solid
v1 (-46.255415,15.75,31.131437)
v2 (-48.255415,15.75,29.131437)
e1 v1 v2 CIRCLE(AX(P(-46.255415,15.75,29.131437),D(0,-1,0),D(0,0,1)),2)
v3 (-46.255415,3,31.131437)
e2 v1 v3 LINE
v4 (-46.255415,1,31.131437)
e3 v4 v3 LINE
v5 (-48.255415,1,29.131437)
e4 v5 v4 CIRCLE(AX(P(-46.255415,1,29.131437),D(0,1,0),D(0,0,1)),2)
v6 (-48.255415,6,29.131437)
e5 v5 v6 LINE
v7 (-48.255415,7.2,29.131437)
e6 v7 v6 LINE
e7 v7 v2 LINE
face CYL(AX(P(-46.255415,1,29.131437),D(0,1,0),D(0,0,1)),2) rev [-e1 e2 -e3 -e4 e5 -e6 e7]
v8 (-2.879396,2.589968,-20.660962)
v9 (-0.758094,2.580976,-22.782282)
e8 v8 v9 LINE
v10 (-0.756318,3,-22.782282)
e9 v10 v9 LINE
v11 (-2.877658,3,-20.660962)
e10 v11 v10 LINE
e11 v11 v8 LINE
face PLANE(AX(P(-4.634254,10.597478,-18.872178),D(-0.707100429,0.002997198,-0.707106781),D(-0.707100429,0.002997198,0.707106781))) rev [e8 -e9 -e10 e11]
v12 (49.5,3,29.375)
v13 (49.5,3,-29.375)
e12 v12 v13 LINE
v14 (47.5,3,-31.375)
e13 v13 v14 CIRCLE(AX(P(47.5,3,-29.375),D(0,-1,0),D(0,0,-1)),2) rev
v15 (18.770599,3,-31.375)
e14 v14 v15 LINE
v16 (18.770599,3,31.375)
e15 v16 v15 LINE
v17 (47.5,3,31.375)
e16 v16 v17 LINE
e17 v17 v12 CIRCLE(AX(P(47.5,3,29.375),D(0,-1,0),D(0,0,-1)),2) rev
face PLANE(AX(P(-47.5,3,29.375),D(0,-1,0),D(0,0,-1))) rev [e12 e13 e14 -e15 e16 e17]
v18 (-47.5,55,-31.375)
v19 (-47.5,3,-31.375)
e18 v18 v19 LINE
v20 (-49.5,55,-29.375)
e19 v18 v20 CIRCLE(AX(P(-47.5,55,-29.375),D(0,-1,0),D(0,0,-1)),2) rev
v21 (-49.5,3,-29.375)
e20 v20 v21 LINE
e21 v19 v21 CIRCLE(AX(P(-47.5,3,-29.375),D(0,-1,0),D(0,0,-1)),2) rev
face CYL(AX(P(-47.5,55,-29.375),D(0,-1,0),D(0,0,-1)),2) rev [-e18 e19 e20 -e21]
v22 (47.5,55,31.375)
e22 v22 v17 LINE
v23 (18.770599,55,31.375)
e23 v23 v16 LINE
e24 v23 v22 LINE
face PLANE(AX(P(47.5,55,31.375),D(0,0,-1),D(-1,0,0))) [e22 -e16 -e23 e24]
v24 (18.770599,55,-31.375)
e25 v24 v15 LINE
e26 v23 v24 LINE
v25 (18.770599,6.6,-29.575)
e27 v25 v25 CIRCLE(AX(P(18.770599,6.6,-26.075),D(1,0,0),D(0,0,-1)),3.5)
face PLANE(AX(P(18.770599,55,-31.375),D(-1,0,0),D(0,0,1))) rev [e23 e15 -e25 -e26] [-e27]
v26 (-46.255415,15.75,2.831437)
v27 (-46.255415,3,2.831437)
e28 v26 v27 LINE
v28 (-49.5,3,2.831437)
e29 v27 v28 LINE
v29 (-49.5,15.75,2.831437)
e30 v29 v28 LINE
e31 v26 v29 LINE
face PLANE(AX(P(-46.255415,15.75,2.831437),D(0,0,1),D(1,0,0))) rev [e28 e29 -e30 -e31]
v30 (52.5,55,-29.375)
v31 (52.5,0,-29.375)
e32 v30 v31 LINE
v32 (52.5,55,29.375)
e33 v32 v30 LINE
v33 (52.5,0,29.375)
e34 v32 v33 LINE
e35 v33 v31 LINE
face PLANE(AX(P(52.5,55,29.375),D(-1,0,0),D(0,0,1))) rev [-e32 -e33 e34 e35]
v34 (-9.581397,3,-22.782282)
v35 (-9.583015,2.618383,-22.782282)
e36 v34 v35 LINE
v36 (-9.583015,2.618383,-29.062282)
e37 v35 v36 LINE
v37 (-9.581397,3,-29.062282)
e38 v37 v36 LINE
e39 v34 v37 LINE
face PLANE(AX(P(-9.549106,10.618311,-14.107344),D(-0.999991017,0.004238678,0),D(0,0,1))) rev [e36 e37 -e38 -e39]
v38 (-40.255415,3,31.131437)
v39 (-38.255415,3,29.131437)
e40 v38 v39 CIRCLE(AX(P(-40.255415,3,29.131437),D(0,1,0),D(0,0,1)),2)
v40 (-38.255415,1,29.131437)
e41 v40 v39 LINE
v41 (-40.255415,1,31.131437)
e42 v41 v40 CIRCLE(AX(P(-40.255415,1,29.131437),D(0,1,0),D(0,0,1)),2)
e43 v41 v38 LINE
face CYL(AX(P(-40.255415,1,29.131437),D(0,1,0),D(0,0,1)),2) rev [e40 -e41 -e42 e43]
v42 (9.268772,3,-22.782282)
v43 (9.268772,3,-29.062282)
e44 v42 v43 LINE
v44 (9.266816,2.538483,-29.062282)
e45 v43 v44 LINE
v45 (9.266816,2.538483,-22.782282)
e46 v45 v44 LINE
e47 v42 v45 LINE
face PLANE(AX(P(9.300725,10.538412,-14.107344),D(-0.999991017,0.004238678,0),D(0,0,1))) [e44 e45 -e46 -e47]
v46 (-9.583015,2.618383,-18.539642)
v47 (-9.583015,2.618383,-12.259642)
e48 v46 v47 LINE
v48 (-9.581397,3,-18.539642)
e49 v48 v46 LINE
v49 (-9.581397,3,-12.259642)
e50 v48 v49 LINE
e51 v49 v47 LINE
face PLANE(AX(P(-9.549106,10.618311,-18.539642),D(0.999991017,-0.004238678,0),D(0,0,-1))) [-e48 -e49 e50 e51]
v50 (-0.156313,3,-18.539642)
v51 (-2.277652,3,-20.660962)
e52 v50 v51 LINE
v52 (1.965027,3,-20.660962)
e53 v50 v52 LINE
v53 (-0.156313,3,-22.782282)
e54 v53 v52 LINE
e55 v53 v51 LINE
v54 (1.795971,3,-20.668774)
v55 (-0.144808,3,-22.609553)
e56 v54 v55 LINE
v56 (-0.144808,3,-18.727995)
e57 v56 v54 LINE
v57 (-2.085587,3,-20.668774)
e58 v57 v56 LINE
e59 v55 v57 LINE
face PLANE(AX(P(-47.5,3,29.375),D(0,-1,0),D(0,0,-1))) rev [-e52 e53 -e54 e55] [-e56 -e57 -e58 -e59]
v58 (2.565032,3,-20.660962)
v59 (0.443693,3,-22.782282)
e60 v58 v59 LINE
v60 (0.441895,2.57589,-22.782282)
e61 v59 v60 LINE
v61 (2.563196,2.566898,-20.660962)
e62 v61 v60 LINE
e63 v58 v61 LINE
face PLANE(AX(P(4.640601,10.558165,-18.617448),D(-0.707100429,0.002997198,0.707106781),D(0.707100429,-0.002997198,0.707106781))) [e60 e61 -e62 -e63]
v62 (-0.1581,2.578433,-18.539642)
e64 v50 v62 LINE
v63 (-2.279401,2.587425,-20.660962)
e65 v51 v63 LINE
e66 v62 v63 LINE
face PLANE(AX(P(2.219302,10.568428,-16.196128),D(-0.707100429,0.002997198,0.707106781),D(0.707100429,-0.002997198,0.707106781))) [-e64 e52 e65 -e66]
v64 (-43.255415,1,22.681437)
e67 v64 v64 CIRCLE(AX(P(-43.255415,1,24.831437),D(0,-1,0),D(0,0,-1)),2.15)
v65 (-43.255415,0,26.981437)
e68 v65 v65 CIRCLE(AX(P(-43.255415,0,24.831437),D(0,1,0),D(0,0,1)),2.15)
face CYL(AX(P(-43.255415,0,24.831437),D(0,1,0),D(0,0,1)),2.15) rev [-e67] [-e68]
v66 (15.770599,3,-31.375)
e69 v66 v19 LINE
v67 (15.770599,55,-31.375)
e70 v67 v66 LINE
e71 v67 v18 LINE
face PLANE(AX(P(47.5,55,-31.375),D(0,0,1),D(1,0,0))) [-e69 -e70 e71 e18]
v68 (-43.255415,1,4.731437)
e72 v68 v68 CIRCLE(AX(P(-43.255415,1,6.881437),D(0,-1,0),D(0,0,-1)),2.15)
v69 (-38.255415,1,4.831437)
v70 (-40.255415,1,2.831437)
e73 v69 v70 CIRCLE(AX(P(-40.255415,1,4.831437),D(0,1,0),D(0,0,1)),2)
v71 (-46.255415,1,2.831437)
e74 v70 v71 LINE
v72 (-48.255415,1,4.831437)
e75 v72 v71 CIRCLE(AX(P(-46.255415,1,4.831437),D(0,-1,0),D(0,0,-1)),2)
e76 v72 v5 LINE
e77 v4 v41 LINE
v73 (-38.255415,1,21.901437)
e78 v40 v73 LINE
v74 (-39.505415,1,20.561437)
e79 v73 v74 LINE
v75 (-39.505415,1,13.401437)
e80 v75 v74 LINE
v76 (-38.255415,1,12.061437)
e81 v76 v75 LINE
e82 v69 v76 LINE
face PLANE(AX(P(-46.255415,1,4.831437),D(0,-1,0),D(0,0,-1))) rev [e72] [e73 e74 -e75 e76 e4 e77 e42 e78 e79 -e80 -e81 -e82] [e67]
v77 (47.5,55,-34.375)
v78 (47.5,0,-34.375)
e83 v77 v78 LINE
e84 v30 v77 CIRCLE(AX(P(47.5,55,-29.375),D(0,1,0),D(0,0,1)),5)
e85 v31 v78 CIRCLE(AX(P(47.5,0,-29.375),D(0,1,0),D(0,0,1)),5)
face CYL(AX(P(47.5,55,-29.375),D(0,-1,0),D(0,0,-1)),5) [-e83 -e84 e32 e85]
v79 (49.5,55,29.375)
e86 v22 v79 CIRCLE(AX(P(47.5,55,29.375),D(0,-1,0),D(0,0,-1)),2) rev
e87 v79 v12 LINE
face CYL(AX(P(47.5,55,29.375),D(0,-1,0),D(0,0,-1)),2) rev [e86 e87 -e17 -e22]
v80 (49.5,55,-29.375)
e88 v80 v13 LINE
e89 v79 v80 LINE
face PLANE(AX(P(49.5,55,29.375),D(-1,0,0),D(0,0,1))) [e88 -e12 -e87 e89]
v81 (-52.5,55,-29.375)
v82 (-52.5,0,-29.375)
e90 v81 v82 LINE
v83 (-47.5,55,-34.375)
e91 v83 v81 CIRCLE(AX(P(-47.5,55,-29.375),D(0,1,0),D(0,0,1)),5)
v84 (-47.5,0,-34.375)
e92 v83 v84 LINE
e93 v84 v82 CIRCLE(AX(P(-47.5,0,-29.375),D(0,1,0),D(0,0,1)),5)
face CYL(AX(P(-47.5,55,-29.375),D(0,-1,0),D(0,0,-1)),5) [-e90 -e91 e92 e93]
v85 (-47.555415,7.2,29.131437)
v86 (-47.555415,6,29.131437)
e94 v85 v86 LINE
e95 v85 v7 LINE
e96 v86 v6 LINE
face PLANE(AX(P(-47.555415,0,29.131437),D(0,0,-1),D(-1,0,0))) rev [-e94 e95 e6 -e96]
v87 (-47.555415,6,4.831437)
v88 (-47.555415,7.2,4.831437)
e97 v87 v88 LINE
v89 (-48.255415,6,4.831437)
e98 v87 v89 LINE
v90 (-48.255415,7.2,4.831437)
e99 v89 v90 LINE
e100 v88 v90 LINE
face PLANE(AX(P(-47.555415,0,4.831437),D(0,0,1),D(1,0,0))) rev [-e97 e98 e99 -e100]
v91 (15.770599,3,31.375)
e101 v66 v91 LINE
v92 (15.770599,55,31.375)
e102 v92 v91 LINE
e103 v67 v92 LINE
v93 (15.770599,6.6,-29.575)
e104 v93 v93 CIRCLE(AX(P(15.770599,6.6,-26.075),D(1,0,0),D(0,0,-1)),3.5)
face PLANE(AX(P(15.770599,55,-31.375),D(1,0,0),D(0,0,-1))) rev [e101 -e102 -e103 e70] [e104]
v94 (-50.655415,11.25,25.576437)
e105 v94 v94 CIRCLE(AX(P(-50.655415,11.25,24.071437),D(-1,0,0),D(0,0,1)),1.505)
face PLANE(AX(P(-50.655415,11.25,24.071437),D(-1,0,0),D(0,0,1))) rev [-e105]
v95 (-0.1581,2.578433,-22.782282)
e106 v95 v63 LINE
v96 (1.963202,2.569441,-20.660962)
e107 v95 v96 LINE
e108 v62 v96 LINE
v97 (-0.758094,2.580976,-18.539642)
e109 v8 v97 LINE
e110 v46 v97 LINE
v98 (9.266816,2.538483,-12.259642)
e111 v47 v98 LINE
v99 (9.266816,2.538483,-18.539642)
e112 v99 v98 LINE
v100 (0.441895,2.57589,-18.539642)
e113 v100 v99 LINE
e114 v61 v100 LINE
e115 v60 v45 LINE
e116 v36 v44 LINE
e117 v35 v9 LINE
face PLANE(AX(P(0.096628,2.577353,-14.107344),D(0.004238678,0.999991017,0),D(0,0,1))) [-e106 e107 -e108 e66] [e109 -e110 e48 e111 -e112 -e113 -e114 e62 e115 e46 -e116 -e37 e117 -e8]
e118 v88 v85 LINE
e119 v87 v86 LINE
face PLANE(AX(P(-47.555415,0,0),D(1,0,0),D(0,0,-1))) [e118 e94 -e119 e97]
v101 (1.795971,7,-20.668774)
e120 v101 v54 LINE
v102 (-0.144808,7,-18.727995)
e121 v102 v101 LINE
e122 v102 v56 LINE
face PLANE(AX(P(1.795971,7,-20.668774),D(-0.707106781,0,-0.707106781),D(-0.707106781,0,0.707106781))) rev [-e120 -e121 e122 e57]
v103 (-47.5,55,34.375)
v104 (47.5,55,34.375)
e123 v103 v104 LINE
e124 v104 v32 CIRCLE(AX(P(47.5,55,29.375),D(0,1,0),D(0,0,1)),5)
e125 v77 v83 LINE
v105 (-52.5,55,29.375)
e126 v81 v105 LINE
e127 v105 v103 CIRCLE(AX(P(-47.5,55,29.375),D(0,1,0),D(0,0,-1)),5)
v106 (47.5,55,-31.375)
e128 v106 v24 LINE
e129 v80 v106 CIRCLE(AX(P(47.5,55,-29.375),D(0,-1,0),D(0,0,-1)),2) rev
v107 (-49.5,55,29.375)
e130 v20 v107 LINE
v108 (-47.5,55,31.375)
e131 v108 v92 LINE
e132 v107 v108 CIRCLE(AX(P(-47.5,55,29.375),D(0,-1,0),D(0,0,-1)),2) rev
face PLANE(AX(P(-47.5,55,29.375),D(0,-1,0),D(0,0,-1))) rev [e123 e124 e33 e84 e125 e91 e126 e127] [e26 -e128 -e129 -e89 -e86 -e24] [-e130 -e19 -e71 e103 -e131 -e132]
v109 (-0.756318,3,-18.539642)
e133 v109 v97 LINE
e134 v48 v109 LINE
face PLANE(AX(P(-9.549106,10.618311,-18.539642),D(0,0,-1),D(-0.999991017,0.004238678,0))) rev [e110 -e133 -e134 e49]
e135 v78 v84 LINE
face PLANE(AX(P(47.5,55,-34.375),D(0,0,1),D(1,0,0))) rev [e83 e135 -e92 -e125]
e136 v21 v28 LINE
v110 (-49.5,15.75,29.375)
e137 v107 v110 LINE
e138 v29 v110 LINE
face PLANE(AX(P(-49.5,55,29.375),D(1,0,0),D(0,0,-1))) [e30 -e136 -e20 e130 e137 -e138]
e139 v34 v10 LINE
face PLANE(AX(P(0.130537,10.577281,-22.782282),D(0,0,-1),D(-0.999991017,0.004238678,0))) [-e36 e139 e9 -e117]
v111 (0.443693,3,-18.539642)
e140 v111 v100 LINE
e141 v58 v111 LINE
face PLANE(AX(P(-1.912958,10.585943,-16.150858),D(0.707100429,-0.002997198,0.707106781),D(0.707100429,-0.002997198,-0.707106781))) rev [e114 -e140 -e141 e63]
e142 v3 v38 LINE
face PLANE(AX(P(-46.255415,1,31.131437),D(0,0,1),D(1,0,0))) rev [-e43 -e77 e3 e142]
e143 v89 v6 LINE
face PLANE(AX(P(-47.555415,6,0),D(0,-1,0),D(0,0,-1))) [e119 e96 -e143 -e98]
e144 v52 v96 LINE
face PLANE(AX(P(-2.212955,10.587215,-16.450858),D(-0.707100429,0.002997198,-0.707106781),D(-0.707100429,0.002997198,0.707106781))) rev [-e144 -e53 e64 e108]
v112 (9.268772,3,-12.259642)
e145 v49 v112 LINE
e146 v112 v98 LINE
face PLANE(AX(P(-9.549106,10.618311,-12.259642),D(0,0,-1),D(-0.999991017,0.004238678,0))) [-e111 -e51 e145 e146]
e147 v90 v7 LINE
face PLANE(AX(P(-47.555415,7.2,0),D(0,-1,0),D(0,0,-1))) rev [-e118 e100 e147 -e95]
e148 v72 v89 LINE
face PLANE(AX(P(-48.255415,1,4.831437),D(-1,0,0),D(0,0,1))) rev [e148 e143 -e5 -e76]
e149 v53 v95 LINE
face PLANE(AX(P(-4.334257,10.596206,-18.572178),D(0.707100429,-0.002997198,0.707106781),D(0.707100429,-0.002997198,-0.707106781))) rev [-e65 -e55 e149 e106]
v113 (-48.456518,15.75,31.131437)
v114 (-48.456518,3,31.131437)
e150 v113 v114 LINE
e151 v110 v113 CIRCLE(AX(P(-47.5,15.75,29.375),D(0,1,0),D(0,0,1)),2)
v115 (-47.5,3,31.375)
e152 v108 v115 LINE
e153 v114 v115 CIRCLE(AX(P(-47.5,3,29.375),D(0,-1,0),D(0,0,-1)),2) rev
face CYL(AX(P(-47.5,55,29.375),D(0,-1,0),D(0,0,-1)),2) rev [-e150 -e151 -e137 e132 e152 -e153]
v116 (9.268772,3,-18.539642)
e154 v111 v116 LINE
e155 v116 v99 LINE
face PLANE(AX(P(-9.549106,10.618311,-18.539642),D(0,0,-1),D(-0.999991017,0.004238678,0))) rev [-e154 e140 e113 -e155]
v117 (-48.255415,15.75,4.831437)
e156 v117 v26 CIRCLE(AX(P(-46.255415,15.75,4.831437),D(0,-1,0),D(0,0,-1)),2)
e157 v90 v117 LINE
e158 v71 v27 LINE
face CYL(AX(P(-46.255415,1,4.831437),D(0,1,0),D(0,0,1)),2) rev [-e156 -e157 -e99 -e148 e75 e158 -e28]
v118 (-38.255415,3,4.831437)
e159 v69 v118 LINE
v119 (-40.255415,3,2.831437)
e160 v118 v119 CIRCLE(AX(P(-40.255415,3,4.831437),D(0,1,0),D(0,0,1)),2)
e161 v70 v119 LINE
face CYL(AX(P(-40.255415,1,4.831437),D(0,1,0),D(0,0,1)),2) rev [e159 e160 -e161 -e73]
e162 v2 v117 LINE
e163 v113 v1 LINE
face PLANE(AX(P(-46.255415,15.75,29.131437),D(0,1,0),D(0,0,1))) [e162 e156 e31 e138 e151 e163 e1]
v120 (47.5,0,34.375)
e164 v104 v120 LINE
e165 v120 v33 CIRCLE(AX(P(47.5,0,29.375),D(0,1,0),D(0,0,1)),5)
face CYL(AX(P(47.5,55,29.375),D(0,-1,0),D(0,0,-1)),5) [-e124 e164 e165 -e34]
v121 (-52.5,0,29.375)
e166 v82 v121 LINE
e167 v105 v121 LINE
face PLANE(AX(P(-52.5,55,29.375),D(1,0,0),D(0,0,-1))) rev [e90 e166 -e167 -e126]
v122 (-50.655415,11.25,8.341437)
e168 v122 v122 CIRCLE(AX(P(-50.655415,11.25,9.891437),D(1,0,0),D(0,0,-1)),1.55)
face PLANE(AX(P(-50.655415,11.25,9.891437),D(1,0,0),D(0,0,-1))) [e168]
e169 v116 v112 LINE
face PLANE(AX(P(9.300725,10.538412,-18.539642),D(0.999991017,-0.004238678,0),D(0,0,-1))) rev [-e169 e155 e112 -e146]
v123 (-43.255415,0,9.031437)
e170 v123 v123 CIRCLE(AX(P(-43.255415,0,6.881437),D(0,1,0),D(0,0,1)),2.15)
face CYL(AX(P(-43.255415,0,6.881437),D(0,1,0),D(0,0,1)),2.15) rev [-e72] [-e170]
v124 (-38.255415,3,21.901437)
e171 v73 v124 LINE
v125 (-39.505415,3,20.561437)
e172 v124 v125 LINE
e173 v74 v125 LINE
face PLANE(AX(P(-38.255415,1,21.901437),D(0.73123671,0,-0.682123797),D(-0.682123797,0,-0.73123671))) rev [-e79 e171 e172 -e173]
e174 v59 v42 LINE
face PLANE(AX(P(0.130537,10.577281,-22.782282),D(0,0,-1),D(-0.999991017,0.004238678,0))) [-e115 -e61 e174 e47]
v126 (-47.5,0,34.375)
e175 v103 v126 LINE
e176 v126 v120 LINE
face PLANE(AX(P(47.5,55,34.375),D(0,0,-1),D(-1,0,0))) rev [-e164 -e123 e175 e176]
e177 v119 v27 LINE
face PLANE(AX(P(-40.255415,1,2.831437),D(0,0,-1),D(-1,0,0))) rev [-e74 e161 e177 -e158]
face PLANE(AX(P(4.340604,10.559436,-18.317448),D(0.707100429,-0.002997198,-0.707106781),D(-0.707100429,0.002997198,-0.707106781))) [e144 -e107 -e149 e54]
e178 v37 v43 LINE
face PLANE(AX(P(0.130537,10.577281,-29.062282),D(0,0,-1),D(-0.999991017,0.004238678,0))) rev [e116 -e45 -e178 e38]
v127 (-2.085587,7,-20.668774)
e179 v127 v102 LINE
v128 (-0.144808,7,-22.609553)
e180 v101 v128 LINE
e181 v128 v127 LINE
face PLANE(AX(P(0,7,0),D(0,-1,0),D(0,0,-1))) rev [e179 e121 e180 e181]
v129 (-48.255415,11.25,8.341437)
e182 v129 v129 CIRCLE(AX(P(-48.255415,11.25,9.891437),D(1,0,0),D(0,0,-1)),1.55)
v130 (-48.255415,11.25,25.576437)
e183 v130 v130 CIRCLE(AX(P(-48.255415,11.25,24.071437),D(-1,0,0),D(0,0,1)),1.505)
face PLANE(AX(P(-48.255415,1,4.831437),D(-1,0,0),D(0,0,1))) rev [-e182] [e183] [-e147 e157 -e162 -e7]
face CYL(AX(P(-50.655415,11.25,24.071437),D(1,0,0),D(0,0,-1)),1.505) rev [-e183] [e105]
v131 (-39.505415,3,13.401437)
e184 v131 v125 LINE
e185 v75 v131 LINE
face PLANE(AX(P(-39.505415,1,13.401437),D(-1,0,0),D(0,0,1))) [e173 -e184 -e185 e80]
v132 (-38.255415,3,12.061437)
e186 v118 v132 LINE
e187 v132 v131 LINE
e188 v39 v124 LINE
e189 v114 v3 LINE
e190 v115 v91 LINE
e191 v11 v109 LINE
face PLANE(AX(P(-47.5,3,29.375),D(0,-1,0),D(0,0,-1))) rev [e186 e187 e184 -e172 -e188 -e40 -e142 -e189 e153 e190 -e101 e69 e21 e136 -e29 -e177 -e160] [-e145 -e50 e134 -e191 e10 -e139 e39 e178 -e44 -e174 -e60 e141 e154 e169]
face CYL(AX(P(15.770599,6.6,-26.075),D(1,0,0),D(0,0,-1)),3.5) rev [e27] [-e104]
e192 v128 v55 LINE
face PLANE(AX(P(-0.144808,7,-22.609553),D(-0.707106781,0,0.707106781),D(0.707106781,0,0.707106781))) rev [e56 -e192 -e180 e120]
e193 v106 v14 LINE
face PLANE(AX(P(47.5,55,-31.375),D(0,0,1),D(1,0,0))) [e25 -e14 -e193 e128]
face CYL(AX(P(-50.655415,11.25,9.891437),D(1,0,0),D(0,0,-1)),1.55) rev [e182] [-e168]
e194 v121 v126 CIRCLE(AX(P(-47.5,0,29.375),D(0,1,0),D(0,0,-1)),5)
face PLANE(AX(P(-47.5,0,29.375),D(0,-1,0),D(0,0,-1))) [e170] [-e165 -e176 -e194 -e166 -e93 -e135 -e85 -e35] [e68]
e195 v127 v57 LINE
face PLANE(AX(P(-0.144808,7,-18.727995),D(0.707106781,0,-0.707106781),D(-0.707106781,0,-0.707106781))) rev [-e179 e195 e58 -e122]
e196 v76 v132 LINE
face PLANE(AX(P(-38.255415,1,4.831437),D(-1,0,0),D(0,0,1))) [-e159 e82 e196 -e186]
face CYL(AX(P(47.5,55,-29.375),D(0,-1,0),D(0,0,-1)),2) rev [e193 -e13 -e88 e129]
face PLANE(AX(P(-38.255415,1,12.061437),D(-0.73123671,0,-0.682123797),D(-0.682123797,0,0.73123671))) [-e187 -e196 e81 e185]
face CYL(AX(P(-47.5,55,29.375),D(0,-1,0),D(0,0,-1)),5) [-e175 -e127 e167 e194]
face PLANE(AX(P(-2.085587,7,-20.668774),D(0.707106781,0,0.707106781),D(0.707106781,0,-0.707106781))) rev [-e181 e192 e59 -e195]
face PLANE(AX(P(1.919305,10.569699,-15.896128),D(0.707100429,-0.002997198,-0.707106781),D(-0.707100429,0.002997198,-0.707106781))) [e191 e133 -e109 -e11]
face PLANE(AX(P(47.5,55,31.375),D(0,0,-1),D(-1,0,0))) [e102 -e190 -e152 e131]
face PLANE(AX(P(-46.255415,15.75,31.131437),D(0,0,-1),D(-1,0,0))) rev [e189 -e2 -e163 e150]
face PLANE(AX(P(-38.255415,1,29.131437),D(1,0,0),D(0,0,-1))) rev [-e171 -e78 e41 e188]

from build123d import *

# Parameters (mm, degrees)
BOSS_EXTRUDE1_DEPTH                     = 55
SHELL1_T                                = -3
CUT_EXTRUDE1_DEPTH                      = 2
BATTERY_CONNECTOR_SKETCH_3_R            = 2.15
CUT_EXTRUDE2_DEPTH                      = 3
BATTERY_CONNECTOR_SKETCH_4_R            = 2.15
CUT_EXTRUDE3_DEPTH                      = 3
BOSS_EXTRUDE6_START                     = 12.75
BOSS_EXTRUDE6_DEPTH                     = 12.75
CONNECTOR_SIDE_MOUNT_SKETCH_R           = 1.55
CONNECTOR_SIDE_MOUNT_SKETCH_R_2         = 1.505
CONNECTOR_MOUNT_PINS_SOCKETS_DEPTH      = 2.4
CONNECTOR_MOUNT_PINS_SOCKETS_SKETCH_3_W = 24.3
CONNECTOR_MOUNT_PINS_SOCKETS_SKETCH_3_H = 1.2
BOSS_EXTRUDE7_DEPTH                     = 0.7
PARTITION_SKETCH_W                      = 3
PARTITION_SKETCH_H                      = 62.75
PARTITION_BOSS_DEPTH                    = 52
SKETCH28_R                              = 3.5
PARTITION_CABLE_PASS_HOLE_DEPTH         = 3
CAVITY2_START                           = 2.577739742
CAVITY2_DEPTH                           = 0.461520646
BOSS_EXTRUDE8_DEPTH                     = 4


# Read off the part's stored shape, not the designer's step: Cavity2
with BuildPart() as part:
    # Sketch2 → Boss-Extrude1 (new body)
    with BuildSketch(Plane(origin=(0, 0, 0), x_dir=(1, 0, 0), z_dir=(0, 1, 0))):
        with BuildLine():
            Line((47.5, -34.375), (-47.5, -34.375))
            ThreePointArc((-47.5, -34.375), (-51.035533906, -32.910533906), (-52.5, -29.375))
            Line((-52.5, -29.375), (-52.5, 29.375))
            ThreePointArc((-52.5, 29.375), (-51.035533906, 32.910533906), (-47.5, 34.375))
            Line((-47.5, 34.375), (47.5, 34.375))
            ThreePointArc((47.5, 34.375), (51.035533906, 32.910533906), (52.5, 29.375))
            Line((52.5, 29.375), (52.5, -29.375))
            ThreePointArc((52.5, -29.375), (51.035533906, -32.910533906), (47.5, -34.375))
        make_face()
    extrude(amount=BOSS_EXTRUDE1_DEPTH)

    # Shell1
    shell1_openings = [part.faces().sort_by_distance(p)[0] for p in [
        (0, 55, 0),
    ]]
    offset(amount=SHELL1_T, openings=shell1_openings, kind=Kind.INTERSECTION)

    # battery_connector_sketch → Cut-Extrude1 (cut)
    with BuildSketch(Plane(origin=(0, 3, 0), x_dir=(1, 0, 0), z_dir=(0, 1, 0))):
        with BuildLine():
            Line((-48.255414742, -4.831437415), (-48.255414742, -29.131437415))
            ThreePointArc((-48.255414742, -29.131437415), (-47.669628305, -30.545650977), (-46.255414742, -31.131437415))
            Line((-46.255414742, -31.131437415), (-40.255414742, -31.131437415))
            ThreePointArc((-40.255414742, -31.131437415), (-38.84120118, -30.545650977), (-38.255414742, -29.131437415))
            Line((-38.255414742, -29.131437415), (-38.255414742, -21.901437415))
            Line((-38.255414742, -21.901437415), (-39.505414742, -20.561437415))
            Line((-39.505414742, -20.561437415), (-39.505414742, -13.401437415))
            Line((-39.505414742, -13.401437415), (-38.255414742, -12.061437415))
            Line((-38.255414742, -12.061437415), (-38.255414742, -4.831437415))
            ThreePointArc((-38.255414742, -4.831437415), (-38.84120118, -3.417223852), (-40.255414742, -2.831437415))
            Line((-40.255414742, -2.831437415), (-46.255414742, -2.831437415))
            ThreePointArc((-46.255414742, -2.831437415), (-47.669628305, -3.417223852), (-48.255414742, -4.831437415))
        make_face()
    extrude(amount=-CUT_EXTRUDE1_DEPTH, mode=Mode.SUBTRACT)

    # battery_connector_sketch<3> → Cut-Extrude2 (cut)
    with BuildSketch(Plane(origin=(0, 3, 0), x_dir=(1, 0, 0), z_dir=(0, 1, 0))):
        with Locations(Location((-43.255414742, -6.881437415, 0), (0, 0, 270))):
            Circle(BATTERY_CONNECTOR_SKETCH_3_R)
    extrude(amount=-CUT_EXTRUDE2_DEPTH, mode=Mode.SUBTRACT)

    # battery_connector_sketch<4> → Cut-Extrude3 (cut)
    with BuildSketch(Plane(origin=(0, 3, 0), x_dir=(1, 0, 0), z_dir=(0, 1, 0))):
        with Locations(Location((-43.255414742, -24.831437415, 0), (0, 0, 270))):
            Circle(BATTERY_CONNECTOR_SKETCH_4_R)
    extrude(amount=-CUT_EXTRUDE3_DEPTH, mode=Mode.SUBTRACT)

    # Sketch25 → Boss-Extrude6 (add)
    with BuildSketch(Plane(origin=(0, 3, 0), x_dir=(1, 0, 0), z_dir=(0, 1, 0)).offset(BOSS_EXTRUDE6_START)):
        with BuildLine():
            Line((-46.255414742, -31.131437415), (-48.456518483, -31.131437415))
            ThreePointArc((-48.456518483, -31.131437415), (-49.21945296, -30.396509431), (-49.5, -29.375))
            Line((-49.5, -29.375), (-49.5, -2.831437415))
            Line((-49.5, -2.831437415), (-46.255414742, -2.831437415))
            ThreePointArc((-46.255414742, -2.831437415), (-47.669628305, -3.417223852), (-48.255414742, -4.831437415))
            Line((-48.255414742, -4.831437415), (-48.255414742, -29.131437415))
            ThreePointArc((-48.255414742, -29.131437415), (-47.669628305, -30.545650977), (-46.255414742, -31.131437415))
        make_face()
    extrude(amount=-BOSS_EXTRUDE6_DEPTH)

    # connector_side_mount_sketch → connector_mount_pins_sockets (cut)
    with BuildSketch(Plane(origin=(-48.255414742, 0, 0), x_dir=(0, 0, -1), z_dir=(1, 0, 0))):
        with Locations((-9.891437415, 11.25)):
            Circle(CONNECTOR_SIDE_MOUNT_SKETCH_R)
        with Locations(Location((-24.071437415, 11.25, 0), (0, 0, 180))):
            Circle(CONNECTOR_SIDE_MOUNT_SKETCH_R_2)
    extrude(amount=-CONNECTOR_MOUNT_PINS_SOCKETS_DEPTH, mode=Mode.SUBTRACT)

    # connector_mount_pins_sockets_sketch<3> → Boss-Extrude7 (add)
    with BuildSketch(Plane(origin=(-48.255414742, 0, 0), x_dir=(0, 0, -1), z_dir=(1, 0, 0))):
        with Locations((-16.981437415, 6.6)):
            Rectangle(CONNECTOR_MOUNT_PINS_SOCKETS_SKETCH_3_W, CONNECTOR_MOUNT_PINS_SOCKETS_SKETCH_3_H)
    extrude(amount=BOSS_EXTRUDE7_DEPTH)

    # partition-sketch → partition-boss (add)
    with BuildSketch(Plane(origin=(0, 3, 0), x_dir=(1, 0, 0), z_dir=(0, 1, 0))):
        with Locations((17.270599113, 0)):
            Rectangle(PARTITION_SKETCH_W, PARTITION_SKETCH_H)
    extrude(amount=PARTITION_BOSS_DEPTH)

    # Sketch28 → partition-cable-pass-hole (cut)
    with BuildSketch(Plane(origin=(18.770599113, 0, 0), x_dir=(0, 0, -1), z_dir=(1, 0, 0))):
        with Locations((26.075, 6.6)):
            Circle(SKETCH28_R)
    extrude(amount=-PARTITION_CABLE_PASS_HOLE_DEPTH, mode=Mode.SUBTRACT)

    # Cavity2 outline → Cavity2 (cut)
    with BuildSketch(Plane(origin=(0, 0, 0), x_dir=(0.9999910167650304, -0.004238677770298889, 0), z_dir=(0.004238677770298889, 0.9999910167650305, 0)).offset(CAVITY2_START)):
        Polygon((0.430972634, 22.782282347), (9.255972634, 22.782282347), (9.255972634, 29.062282347), (-9.594027366, 29.062282347), (-9.594027366, 22.782282347), (-0.769027366, 22.782282347), (-2.890347709, 20.660962004), (-0.769027366, 18.53964166), (-9.594027366, 18.53964166), (-9.594027366, 12.25964166), (9.255972634, 12.25964166), (9.255972634, 18.53964166), (0.430972634, 18.53964166), (2.552292978, 20.660962004), align=None)
        Polygon((-0.169027366, 18.53964166), (-2.290347709, 20.660962004), (-0.169027366, 22.782282347), (1.952292978, 20.660962004), align=None, mode=Mode.SUBTRACT)
    extrude(amount=CAVITY2_DEPTH, mode=Mode.SUBTRACT)

    # Sketch32 → Boss-Extrude8 (add)
    with BuildSketch(Plane(origin=(0, 3, 0), x_dir=(1, 0, 0), z_dir=(0, 1, 0))):
        Polygon((-0.144808067, 22.60955262), (1.795970783, 20.66877377), (-0.144808067, 18.727994921), (-2.085586916, 20.66877377), align=None)
    extrude(amount=BOSS_EXTRUDE8_DEPTH)


solid = part.part
